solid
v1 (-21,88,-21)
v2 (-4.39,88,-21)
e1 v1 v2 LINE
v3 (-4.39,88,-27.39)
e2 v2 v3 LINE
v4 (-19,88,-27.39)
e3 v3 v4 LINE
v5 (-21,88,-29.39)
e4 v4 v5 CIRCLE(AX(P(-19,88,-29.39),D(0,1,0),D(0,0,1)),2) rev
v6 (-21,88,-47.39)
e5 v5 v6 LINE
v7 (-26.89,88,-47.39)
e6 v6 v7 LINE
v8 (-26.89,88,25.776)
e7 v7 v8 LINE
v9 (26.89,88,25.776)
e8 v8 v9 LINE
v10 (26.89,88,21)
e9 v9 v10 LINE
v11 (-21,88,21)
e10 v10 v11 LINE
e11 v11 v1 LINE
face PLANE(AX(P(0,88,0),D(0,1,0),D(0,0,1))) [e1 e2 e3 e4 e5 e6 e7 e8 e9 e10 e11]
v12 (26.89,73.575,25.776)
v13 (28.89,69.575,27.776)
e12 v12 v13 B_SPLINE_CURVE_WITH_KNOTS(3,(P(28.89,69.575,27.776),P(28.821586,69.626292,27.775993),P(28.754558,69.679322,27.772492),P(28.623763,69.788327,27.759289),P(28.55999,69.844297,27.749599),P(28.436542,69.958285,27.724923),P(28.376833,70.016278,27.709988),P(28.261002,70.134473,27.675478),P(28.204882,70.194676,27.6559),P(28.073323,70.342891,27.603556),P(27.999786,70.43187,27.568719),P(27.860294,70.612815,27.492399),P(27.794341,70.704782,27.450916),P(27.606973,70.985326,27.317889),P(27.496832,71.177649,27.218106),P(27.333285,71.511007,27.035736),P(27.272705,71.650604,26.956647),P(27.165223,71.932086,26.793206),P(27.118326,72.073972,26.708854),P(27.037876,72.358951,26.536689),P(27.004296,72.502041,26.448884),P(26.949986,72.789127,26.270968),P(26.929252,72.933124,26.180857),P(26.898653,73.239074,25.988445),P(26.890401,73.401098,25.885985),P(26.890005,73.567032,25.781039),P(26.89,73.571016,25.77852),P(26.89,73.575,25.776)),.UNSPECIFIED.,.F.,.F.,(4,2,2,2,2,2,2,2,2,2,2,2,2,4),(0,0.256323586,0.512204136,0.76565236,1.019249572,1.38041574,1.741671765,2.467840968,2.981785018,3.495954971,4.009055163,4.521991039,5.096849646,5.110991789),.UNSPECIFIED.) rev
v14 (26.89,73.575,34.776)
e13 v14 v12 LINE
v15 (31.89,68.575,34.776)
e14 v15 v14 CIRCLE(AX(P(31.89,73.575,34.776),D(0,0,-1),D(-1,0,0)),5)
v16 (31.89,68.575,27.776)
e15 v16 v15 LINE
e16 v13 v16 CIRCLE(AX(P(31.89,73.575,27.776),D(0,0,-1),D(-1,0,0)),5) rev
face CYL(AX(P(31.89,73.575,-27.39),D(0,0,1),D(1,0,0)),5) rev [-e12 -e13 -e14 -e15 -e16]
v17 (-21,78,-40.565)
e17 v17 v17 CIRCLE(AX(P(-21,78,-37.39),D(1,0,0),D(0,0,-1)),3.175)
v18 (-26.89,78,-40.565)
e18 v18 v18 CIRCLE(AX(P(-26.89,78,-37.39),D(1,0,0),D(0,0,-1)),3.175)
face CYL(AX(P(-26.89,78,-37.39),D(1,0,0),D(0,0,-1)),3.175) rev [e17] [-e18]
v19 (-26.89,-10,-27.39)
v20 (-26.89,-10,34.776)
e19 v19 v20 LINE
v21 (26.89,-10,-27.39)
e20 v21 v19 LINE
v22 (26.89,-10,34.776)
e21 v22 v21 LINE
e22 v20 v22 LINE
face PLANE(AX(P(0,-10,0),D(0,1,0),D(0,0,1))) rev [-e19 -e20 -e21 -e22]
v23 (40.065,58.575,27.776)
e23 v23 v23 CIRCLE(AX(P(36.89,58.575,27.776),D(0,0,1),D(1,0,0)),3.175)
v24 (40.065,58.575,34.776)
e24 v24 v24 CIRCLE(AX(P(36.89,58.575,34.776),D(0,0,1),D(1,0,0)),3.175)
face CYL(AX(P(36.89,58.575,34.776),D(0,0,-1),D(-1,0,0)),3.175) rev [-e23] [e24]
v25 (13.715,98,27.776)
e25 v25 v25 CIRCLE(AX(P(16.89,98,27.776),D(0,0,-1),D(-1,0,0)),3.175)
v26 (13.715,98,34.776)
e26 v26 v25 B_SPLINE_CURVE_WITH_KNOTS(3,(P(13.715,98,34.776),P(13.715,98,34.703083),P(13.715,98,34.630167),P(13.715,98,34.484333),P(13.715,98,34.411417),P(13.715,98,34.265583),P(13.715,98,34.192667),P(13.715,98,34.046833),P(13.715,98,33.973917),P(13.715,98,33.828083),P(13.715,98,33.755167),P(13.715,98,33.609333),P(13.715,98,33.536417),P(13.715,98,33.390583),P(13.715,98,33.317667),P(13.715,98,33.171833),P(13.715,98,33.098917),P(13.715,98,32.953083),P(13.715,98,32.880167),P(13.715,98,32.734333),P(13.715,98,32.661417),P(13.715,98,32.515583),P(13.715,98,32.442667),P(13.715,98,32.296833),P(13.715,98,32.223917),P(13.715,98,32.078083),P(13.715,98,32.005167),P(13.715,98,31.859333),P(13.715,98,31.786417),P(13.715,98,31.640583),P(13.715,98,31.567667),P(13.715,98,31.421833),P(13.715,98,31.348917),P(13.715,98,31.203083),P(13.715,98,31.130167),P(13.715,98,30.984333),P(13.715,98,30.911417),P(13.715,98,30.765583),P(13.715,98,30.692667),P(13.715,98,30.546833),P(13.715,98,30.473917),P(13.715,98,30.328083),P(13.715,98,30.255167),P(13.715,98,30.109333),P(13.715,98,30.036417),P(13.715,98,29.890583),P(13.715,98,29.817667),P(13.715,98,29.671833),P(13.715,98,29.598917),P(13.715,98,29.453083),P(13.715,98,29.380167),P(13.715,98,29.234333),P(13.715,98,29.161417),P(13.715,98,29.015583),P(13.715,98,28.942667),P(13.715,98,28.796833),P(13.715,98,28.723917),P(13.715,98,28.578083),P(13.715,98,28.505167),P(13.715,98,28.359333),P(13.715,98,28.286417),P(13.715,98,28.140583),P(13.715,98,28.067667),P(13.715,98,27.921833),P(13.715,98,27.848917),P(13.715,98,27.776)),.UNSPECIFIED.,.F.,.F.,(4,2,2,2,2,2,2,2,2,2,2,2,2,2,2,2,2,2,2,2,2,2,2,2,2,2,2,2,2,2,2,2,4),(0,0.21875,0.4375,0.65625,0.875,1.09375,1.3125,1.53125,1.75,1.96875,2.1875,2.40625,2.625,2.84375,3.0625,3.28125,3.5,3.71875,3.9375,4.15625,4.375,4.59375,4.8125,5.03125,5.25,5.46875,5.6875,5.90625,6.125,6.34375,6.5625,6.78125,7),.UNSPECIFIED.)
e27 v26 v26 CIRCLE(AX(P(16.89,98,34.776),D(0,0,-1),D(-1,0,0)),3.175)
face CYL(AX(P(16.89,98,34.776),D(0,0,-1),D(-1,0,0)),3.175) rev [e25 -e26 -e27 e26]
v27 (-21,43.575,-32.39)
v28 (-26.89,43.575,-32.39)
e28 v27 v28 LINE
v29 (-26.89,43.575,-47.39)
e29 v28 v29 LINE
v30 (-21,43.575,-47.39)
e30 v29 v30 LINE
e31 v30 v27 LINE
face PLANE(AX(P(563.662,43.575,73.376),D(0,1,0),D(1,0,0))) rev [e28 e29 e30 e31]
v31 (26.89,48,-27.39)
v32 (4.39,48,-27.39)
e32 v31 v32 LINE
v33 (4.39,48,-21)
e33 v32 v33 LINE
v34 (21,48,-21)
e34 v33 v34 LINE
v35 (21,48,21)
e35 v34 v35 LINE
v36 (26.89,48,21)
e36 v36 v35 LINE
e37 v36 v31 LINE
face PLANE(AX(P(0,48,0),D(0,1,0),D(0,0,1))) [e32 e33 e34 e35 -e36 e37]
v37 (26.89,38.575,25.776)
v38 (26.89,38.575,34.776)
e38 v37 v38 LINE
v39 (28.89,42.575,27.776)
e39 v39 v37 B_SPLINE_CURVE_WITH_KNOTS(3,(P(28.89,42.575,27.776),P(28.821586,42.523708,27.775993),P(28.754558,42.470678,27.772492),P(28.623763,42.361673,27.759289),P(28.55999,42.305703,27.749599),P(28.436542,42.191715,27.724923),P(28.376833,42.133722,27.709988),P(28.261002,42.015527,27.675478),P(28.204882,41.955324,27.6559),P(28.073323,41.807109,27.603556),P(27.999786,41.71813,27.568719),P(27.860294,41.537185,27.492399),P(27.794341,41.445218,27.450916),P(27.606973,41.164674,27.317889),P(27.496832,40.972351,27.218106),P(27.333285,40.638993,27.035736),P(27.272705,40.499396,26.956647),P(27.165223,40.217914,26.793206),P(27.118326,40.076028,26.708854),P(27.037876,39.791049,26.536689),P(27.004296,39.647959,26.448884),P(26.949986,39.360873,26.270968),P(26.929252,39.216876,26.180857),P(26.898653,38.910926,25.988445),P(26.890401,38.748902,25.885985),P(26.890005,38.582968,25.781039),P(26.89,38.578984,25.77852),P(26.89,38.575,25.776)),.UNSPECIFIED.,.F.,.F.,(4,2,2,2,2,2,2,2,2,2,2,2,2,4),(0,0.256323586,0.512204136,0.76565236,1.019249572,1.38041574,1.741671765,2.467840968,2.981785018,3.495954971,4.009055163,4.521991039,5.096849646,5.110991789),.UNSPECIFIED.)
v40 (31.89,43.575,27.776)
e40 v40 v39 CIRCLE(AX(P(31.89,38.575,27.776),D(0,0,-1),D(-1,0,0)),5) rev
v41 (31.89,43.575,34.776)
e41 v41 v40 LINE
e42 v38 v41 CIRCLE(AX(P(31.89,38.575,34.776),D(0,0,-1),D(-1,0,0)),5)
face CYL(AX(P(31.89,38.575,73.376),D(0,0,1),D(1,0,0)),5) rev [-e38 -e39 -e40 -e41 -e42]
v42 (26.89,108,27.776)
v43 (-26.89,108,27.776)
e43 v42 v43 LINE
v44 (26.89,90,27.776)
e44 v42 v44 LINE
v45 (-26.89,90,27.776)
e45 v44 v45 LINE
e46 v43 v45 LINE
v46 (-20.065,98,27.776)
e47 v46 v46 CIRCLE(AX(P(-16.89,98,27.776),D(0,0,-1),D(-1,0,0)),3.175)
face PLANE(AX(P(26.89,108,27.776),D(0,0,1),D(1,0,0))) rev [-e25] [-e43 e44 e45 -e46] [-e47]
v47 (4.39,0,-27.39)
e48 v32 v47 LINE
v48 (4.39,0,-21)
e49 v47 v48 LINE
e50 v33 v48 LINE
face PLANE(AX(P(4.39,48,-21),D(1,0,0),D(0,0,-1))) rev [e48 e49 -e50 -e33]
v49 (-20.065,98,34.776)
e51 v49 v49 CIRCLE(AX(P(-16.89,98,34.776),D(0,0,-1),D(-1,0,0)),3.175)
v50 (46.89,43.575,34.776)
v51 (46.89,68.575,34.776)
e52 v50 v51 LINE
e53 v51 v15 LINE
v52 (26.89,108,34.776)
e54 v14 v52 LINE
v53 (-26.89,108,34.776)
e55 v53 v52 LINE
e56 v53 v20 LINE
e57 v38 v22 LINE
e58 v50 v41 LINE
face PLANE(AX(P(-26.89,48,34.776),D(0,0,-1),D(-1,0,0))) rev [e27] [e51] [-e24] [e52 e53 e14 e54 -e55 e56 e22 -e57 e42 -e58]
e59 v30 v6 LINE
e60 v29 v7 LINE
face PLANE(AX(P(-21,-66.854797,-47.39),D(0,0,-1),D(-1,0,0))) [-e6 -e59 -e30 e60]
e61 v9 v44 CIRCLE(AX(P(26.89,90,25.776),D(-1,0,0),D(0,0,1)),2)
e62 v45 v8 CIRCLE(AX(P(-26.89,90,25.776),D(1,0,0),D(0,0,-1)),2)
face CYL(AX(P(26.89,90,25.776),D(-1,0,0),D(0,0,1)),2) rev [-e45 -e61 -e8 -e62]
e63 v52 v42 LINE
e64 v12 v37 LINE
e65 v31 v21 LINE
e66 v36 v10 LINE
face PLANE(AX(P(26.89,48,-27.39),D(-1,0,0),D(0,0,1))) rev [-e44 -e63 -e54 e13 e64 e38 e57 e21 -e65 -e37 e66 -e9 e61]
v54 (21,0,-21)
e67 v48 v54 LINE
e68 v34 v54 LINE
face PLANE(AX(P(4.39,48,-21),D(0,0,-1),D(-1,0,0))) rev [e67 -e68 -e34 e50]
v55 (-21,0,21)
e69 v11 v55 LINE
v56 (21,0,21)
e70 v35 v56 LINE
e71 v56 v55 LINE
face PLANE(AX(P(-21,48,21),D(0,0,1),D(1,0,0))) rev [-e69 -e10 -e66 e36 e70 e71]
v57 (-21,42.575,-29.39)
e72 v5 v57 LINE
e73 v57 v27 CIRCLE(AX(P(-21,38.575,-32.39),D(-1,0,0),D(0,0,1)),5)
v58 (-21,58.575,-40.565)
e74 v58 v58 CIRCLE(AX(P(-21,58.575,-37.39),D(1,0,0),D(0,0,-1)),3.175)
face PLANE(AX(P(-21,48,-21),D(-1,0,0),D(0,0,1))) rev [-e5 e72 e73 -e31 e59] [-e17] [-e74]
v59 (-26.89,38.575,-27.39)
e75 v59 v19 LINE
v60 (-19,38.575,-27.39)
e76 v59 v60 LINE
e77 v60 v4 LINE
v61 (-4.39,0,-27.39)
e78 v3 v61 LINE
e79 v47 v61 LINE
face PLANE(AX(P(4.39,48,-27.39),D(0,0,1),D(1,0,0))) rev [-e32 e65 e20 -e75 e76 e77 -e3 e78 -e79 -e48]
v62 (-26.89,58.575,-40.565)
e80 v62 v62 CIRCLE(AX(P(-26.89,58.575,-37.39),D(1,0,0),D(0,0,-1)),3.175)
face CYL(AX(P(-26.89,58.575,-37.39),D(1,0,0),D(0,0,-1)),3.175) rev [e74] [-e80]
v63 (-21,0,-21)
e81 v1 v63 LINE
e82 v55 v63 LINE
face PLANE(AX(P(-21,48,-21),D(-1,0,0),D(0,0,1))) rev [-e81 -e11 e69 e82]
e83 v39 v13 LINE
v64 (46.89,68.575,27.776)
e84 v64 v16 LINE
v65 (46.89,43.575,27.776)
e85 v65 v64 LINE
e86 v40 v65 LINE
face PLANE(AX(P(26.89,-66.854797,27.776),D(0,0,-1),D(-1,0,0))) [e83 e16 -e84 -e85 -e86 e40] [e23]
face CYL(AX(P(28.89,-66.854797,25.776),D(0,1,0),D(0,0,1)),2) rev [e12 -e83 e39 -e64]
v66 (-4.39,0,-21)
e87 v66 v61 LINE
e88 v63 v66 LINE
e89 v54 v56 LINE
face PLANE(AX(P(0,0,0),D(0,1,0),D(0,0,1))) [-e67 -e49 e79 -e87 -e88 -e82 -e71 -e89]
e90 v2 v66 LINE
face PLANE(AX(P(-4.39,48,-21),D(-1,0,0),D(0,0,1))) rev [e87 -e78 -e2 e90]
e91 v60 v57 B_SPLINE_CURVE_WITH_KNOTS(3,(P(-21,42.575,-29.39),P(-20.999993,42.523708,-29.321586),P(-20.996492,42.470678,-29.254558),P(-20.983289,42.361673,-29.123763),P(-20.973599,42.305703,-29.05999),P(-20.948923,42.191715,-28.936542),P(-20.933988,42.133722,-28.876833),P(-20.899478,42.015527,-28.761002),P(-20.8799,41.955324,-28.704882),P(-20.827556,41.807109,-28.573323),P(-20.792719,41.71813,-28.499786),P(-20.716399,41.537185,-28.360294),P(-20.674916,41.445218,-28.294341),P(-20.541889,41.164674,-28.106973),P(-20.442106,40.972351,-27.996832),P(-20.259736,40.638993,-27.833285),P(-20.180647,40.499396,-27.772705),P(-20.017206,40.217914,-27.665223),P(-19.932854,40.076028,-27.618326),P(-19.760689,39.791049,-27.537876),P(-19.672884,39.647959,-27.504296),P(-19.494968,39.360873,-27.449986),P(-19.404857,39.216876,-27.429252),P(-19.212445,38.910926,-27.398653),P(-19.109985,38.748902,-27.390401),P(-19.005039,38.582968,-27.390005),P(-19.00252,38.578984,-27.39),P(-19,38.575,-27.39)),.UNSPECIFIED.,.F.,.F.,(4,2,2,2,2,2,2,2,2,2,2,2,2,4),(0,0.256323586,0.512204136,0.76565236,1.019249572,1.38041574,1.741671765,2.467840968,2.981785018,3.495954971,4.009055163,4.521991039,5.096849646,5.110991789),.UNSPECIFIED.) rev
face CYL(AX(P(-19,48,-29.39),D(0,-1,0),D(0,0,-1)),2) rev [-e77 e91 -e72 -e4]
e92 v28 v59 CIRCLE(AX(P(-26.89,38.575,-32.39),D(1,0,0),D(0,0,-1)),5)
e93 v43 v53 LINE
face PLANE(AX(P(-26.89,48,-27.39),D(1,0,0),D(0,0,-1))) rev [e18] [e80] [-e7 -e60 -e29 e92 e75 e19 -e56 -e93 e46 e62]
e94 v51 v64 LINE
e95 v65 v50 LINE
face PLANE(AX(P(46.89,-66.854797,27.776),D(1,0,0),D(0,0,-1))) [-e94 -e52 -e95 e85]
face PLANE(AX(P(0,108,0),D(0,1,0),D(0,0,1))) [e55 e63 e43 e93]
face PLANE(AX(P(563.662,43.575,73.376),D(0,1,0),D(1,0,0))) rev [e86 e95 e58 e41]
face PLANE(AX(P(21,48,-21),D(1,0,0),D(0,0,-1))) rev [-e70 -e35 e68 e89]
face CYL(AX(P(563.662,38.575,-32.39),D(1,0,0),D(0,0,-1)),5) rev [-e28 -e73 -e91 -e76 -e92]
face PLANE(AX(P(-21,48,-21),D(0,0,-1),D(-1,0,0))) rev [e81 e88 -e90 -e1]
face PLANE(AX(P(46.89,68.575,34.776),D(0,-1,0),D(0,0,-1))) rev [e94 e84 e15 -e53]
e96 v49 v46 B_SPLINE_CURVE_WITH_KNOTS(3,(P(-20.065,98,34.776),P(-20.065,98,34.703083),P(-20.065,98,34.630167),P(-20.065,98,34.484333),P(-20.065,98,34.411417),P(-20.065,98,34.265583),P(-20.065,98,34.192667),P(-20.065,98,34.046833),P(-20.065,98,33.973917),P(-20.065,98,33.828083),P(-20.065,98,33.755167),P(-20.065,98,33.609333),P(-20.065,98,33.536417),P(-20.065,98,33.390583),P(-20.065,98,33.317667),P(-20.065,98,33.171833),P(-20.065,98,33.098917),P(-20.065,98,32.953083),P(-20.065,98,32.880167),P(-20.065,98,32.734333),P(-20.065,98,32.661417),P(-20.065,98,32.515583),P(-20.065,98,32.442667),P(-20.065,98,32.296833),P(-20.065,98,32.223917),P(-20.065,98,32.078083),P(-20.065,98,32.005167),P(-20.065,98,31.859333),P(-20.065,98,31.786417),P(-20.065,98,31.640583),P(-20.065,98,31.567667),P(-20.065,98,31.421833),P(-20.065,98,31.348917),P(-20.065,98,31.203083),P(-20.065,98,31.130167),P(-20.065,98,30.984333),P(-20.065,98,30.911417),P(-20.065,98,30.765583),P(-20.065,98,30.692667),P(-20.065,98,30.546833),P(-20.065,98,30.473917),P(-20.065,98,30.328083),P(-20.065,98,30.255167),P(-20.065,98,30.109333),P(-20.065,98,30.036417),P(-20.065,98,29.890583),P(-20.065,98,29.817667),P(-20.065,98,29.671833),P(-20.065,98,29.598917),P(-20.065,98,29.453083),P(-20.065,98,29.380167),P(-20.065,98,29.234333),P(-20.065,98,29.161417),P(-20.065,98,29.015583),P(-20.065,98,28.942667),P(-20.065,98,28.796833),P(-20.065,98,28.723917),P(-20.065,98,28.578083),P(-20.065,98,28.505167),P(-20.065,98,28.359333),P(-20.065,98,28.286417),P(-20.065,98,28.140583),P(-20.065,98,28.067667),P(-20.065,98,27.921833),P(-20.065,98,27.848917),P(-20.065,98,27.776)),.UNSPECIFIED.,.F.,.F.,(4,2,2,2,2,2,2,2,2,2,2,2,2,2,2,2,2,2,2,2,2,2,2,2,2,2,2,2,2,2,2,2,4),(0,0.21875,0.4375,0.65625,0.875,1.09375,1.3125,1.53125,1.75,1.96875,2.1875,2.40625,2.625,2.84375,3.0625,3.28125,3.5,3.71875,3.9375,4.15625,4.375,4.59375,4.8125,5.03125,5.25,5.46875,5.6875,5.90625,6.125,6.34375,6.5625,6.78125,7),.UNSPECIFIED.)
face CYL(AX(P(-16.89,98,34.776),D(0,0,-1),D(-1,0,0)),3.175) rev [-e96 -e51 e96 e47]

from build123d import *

# Parameters (mm, degrees)
BOSS_EXTRUDE1_DEPTH      = 48
SKETCH2_W                = 53.78
SKETCH2_H                = 62.166
BOSS_EXTRUDE2_DEPTH      = 10
BOSS_EXTRUDE3_DEPTH      = 40
BOSS_EXTRUDE3_DEPTH_BACK = 4.425
SKETCH6_W                = 20
SKETCH6_H                = 19.425
CUT_EXTRUDE3_DEPTH       = 125.870331368
SKETCH7_W                = 53.78
SKETCH7_H                = 7
BOSS_EXTRUDE4_DEPTH      = 20
SKETCH9_W                = 16.61
SKETCH9_H                = 6.39
BOSS_EXTRUDE5_DEPTH      = 40
SKETCH4_R                = 3.175
CUT_EXTRUDE1_DEPTH       = 137.084033597
SKETCH5_R                = 3.175
CUT_EXTRUDE2_DEPTH       = 140.687507158
SKETCH8_R                = 3.175
CUT_EXTRUDE4_DEPTH       = 140.687507158
FILLET1_R                = 2
FILLET2_R                = 5


with BuildPart() as part:
    # Sketch1 → Boss-Extrude1 (new body)
    with BuildSketch(Plane(origin=(0, 0, 0), x_dir=(1, 0, 0), z_dir=(0, 1, 0))):
        Polygon((4.39, 21), (4.39, 27.39), (26.89, 27.39), (26.89, -34.776), (-26.89, -34.776), (-26.89, 27.39), (-4.39, 27.39), (-4.39, 21), (-21, 21), (-21, -21), (21, -21), (21, 21), align=None)
    extrude(amount=BOSS_EXTRUDE1_DEPTH)

    # Sketch2 → Boss-Extrude2 (add)
    with BuildSketch(Plane(origin=(0, 0, 0), x_dir=(1, 0, 0), z_dir=(0, 1, 0))):
        with Locations((0, -3.693)):
            Rectangle(SKETCH2_W, SKETCH2_H)
    extrude(amount=-BOSS_EXTRUDE2_DEPTH)

    # Sketch3 → Boss-Extrude3 (add, two sides: drawn at the far end of the back side and taken through both)
    with BuildSketch(Plane(origin=(0, 48, 0), x_dir=(1, 0, 0), z_dir=(0, 1, 0)).offset(-BOSS_EXTRUDE3_DEPTH_BACK)):
        Polygon((26.89, -21), (26.89, -27.776), (46.89, -27.776), (46.89, -34.776), (-26.89, -34.776), (-26.89, 47.39), (-21, 47.39), (-21, -21), align=None)
    extrude(amount=BOSS_EXTRUDE3_DEPTH + BOSS_EXTRUDE3_DEPTH_BACK)

    # Sketch6 → Cut-Extrude3 (cut, through all)
    with BuildSketch(Plane(origin=(0, 0, 27.776), x_dir=(-1, 0, 0), z_dir=(0, 0, -1))):
        with Locations((-36.89, 78.2875)):
            Rectangle(SKETCH6_W, SKETCH6_H)
    extrude(amount=-CUT_EXTRUDE3_DEPTH, mode=Mode.SUBTRACT)

    # Sketch7 → Boss-Extrude4 (add)
    with BuildSketch(Plane(origin=(0, 88, 0), x_dir=(1, 0, 0), z_dir=(0, 1, 0))):
        with Locations((0, -31.276)):
            Rectangle(SKETCH7_W, SKETCH7_H)
    extrude(amount=BOSS_EXTRUDE4_DEPTH)

    # Sketch9 → Boss-Extrude5 (add)
    with BuildSketch(Plane(origin=(0, 48, 0), x_dir=(1, 0, 0), z_dir=(0, 1, 0))):
        with Locations((-12.695, 24.195)):
            Rectangle(SKETCH9_W, SKETCH9_H)
    extrude(amount=BOSS_EXTRUDE5_DEPTH)

    # Sketch4 → Cut-Extrude1 (cut, through all)
    with BuildSketch(Plane(origin=(-21, 0, 0), x_dir=(0, 0, -1), z_dir=(1, 0, 0))):
        with Locations((37.39, 78)):
            Circle(SKETCH4_R)
        with Locations((37.39, 58.575)):
            Circle(SKETCH4_R)
    extrude(amount=-CUT_EXTRUDE1_DEPTH, mode=Mode.SUBTRACT)

    # Sketch5 → Cut-Extrude2 (cut, through all)
    with BuildSketch(Plane.XY.offset(27.776)):
        with Locations((36.89, 58.575)):
            Circle(SKETCH5_R)
    extrude(amount=CUT_EXTRUDE2_DEPTH, mode=Mode.SUBTRACT)

    # Sketch8 → Cut-Extrude4 (cut, through all)
    with BuildSketch(Plane(origin=(0, 0, 27.776), x_dir=(-1, 0, 0), z_dir=(0, 0, -1))):
        with Locations((-16.89, 98)):
            Circle(SKETCH8_R)
        with Locations((16.89, 98)):
            Circle(SKETCH8_R)
    extrude(amount=-CUT_EXTRUDE4_DEPTH, mode=Mode.SUBTRACT)

    # Fillet1
    fillet1_edges = [part.edges().sort_by_distance(p)[0] for p in [
        (26.89, 56.075, 27.776),
        (0, 88, 27.776),
        (-21, 65.7875, -27.39),
    ]]
    fillet(fillet1_edges, radius=FILLET1_R)

    # Fillet2
    fillet2_edges = [part.edges().sort_by_distance(p)[0] for p in [
        (-22.945, 43.575, -27.39),
    ]]
    fillet(fillet2_edges, radius=FILLET2_R)
    fillet2_2_edges = [part.edges().sort_by_distance(p)[0] for p in [
        (26.89, 68.575, 30.276),
    ]]
    fillet(fillet2_2_edges, radius=FILLET2_R)
    fillet2_3_edges = [part.edges().sort_by_distance(p)[0] for p in [
        (26.89, 43.575, 30.276),
    ]]
    fillet(fillet2_3_edges, radius=FILLET2_R)


solid = part.part
